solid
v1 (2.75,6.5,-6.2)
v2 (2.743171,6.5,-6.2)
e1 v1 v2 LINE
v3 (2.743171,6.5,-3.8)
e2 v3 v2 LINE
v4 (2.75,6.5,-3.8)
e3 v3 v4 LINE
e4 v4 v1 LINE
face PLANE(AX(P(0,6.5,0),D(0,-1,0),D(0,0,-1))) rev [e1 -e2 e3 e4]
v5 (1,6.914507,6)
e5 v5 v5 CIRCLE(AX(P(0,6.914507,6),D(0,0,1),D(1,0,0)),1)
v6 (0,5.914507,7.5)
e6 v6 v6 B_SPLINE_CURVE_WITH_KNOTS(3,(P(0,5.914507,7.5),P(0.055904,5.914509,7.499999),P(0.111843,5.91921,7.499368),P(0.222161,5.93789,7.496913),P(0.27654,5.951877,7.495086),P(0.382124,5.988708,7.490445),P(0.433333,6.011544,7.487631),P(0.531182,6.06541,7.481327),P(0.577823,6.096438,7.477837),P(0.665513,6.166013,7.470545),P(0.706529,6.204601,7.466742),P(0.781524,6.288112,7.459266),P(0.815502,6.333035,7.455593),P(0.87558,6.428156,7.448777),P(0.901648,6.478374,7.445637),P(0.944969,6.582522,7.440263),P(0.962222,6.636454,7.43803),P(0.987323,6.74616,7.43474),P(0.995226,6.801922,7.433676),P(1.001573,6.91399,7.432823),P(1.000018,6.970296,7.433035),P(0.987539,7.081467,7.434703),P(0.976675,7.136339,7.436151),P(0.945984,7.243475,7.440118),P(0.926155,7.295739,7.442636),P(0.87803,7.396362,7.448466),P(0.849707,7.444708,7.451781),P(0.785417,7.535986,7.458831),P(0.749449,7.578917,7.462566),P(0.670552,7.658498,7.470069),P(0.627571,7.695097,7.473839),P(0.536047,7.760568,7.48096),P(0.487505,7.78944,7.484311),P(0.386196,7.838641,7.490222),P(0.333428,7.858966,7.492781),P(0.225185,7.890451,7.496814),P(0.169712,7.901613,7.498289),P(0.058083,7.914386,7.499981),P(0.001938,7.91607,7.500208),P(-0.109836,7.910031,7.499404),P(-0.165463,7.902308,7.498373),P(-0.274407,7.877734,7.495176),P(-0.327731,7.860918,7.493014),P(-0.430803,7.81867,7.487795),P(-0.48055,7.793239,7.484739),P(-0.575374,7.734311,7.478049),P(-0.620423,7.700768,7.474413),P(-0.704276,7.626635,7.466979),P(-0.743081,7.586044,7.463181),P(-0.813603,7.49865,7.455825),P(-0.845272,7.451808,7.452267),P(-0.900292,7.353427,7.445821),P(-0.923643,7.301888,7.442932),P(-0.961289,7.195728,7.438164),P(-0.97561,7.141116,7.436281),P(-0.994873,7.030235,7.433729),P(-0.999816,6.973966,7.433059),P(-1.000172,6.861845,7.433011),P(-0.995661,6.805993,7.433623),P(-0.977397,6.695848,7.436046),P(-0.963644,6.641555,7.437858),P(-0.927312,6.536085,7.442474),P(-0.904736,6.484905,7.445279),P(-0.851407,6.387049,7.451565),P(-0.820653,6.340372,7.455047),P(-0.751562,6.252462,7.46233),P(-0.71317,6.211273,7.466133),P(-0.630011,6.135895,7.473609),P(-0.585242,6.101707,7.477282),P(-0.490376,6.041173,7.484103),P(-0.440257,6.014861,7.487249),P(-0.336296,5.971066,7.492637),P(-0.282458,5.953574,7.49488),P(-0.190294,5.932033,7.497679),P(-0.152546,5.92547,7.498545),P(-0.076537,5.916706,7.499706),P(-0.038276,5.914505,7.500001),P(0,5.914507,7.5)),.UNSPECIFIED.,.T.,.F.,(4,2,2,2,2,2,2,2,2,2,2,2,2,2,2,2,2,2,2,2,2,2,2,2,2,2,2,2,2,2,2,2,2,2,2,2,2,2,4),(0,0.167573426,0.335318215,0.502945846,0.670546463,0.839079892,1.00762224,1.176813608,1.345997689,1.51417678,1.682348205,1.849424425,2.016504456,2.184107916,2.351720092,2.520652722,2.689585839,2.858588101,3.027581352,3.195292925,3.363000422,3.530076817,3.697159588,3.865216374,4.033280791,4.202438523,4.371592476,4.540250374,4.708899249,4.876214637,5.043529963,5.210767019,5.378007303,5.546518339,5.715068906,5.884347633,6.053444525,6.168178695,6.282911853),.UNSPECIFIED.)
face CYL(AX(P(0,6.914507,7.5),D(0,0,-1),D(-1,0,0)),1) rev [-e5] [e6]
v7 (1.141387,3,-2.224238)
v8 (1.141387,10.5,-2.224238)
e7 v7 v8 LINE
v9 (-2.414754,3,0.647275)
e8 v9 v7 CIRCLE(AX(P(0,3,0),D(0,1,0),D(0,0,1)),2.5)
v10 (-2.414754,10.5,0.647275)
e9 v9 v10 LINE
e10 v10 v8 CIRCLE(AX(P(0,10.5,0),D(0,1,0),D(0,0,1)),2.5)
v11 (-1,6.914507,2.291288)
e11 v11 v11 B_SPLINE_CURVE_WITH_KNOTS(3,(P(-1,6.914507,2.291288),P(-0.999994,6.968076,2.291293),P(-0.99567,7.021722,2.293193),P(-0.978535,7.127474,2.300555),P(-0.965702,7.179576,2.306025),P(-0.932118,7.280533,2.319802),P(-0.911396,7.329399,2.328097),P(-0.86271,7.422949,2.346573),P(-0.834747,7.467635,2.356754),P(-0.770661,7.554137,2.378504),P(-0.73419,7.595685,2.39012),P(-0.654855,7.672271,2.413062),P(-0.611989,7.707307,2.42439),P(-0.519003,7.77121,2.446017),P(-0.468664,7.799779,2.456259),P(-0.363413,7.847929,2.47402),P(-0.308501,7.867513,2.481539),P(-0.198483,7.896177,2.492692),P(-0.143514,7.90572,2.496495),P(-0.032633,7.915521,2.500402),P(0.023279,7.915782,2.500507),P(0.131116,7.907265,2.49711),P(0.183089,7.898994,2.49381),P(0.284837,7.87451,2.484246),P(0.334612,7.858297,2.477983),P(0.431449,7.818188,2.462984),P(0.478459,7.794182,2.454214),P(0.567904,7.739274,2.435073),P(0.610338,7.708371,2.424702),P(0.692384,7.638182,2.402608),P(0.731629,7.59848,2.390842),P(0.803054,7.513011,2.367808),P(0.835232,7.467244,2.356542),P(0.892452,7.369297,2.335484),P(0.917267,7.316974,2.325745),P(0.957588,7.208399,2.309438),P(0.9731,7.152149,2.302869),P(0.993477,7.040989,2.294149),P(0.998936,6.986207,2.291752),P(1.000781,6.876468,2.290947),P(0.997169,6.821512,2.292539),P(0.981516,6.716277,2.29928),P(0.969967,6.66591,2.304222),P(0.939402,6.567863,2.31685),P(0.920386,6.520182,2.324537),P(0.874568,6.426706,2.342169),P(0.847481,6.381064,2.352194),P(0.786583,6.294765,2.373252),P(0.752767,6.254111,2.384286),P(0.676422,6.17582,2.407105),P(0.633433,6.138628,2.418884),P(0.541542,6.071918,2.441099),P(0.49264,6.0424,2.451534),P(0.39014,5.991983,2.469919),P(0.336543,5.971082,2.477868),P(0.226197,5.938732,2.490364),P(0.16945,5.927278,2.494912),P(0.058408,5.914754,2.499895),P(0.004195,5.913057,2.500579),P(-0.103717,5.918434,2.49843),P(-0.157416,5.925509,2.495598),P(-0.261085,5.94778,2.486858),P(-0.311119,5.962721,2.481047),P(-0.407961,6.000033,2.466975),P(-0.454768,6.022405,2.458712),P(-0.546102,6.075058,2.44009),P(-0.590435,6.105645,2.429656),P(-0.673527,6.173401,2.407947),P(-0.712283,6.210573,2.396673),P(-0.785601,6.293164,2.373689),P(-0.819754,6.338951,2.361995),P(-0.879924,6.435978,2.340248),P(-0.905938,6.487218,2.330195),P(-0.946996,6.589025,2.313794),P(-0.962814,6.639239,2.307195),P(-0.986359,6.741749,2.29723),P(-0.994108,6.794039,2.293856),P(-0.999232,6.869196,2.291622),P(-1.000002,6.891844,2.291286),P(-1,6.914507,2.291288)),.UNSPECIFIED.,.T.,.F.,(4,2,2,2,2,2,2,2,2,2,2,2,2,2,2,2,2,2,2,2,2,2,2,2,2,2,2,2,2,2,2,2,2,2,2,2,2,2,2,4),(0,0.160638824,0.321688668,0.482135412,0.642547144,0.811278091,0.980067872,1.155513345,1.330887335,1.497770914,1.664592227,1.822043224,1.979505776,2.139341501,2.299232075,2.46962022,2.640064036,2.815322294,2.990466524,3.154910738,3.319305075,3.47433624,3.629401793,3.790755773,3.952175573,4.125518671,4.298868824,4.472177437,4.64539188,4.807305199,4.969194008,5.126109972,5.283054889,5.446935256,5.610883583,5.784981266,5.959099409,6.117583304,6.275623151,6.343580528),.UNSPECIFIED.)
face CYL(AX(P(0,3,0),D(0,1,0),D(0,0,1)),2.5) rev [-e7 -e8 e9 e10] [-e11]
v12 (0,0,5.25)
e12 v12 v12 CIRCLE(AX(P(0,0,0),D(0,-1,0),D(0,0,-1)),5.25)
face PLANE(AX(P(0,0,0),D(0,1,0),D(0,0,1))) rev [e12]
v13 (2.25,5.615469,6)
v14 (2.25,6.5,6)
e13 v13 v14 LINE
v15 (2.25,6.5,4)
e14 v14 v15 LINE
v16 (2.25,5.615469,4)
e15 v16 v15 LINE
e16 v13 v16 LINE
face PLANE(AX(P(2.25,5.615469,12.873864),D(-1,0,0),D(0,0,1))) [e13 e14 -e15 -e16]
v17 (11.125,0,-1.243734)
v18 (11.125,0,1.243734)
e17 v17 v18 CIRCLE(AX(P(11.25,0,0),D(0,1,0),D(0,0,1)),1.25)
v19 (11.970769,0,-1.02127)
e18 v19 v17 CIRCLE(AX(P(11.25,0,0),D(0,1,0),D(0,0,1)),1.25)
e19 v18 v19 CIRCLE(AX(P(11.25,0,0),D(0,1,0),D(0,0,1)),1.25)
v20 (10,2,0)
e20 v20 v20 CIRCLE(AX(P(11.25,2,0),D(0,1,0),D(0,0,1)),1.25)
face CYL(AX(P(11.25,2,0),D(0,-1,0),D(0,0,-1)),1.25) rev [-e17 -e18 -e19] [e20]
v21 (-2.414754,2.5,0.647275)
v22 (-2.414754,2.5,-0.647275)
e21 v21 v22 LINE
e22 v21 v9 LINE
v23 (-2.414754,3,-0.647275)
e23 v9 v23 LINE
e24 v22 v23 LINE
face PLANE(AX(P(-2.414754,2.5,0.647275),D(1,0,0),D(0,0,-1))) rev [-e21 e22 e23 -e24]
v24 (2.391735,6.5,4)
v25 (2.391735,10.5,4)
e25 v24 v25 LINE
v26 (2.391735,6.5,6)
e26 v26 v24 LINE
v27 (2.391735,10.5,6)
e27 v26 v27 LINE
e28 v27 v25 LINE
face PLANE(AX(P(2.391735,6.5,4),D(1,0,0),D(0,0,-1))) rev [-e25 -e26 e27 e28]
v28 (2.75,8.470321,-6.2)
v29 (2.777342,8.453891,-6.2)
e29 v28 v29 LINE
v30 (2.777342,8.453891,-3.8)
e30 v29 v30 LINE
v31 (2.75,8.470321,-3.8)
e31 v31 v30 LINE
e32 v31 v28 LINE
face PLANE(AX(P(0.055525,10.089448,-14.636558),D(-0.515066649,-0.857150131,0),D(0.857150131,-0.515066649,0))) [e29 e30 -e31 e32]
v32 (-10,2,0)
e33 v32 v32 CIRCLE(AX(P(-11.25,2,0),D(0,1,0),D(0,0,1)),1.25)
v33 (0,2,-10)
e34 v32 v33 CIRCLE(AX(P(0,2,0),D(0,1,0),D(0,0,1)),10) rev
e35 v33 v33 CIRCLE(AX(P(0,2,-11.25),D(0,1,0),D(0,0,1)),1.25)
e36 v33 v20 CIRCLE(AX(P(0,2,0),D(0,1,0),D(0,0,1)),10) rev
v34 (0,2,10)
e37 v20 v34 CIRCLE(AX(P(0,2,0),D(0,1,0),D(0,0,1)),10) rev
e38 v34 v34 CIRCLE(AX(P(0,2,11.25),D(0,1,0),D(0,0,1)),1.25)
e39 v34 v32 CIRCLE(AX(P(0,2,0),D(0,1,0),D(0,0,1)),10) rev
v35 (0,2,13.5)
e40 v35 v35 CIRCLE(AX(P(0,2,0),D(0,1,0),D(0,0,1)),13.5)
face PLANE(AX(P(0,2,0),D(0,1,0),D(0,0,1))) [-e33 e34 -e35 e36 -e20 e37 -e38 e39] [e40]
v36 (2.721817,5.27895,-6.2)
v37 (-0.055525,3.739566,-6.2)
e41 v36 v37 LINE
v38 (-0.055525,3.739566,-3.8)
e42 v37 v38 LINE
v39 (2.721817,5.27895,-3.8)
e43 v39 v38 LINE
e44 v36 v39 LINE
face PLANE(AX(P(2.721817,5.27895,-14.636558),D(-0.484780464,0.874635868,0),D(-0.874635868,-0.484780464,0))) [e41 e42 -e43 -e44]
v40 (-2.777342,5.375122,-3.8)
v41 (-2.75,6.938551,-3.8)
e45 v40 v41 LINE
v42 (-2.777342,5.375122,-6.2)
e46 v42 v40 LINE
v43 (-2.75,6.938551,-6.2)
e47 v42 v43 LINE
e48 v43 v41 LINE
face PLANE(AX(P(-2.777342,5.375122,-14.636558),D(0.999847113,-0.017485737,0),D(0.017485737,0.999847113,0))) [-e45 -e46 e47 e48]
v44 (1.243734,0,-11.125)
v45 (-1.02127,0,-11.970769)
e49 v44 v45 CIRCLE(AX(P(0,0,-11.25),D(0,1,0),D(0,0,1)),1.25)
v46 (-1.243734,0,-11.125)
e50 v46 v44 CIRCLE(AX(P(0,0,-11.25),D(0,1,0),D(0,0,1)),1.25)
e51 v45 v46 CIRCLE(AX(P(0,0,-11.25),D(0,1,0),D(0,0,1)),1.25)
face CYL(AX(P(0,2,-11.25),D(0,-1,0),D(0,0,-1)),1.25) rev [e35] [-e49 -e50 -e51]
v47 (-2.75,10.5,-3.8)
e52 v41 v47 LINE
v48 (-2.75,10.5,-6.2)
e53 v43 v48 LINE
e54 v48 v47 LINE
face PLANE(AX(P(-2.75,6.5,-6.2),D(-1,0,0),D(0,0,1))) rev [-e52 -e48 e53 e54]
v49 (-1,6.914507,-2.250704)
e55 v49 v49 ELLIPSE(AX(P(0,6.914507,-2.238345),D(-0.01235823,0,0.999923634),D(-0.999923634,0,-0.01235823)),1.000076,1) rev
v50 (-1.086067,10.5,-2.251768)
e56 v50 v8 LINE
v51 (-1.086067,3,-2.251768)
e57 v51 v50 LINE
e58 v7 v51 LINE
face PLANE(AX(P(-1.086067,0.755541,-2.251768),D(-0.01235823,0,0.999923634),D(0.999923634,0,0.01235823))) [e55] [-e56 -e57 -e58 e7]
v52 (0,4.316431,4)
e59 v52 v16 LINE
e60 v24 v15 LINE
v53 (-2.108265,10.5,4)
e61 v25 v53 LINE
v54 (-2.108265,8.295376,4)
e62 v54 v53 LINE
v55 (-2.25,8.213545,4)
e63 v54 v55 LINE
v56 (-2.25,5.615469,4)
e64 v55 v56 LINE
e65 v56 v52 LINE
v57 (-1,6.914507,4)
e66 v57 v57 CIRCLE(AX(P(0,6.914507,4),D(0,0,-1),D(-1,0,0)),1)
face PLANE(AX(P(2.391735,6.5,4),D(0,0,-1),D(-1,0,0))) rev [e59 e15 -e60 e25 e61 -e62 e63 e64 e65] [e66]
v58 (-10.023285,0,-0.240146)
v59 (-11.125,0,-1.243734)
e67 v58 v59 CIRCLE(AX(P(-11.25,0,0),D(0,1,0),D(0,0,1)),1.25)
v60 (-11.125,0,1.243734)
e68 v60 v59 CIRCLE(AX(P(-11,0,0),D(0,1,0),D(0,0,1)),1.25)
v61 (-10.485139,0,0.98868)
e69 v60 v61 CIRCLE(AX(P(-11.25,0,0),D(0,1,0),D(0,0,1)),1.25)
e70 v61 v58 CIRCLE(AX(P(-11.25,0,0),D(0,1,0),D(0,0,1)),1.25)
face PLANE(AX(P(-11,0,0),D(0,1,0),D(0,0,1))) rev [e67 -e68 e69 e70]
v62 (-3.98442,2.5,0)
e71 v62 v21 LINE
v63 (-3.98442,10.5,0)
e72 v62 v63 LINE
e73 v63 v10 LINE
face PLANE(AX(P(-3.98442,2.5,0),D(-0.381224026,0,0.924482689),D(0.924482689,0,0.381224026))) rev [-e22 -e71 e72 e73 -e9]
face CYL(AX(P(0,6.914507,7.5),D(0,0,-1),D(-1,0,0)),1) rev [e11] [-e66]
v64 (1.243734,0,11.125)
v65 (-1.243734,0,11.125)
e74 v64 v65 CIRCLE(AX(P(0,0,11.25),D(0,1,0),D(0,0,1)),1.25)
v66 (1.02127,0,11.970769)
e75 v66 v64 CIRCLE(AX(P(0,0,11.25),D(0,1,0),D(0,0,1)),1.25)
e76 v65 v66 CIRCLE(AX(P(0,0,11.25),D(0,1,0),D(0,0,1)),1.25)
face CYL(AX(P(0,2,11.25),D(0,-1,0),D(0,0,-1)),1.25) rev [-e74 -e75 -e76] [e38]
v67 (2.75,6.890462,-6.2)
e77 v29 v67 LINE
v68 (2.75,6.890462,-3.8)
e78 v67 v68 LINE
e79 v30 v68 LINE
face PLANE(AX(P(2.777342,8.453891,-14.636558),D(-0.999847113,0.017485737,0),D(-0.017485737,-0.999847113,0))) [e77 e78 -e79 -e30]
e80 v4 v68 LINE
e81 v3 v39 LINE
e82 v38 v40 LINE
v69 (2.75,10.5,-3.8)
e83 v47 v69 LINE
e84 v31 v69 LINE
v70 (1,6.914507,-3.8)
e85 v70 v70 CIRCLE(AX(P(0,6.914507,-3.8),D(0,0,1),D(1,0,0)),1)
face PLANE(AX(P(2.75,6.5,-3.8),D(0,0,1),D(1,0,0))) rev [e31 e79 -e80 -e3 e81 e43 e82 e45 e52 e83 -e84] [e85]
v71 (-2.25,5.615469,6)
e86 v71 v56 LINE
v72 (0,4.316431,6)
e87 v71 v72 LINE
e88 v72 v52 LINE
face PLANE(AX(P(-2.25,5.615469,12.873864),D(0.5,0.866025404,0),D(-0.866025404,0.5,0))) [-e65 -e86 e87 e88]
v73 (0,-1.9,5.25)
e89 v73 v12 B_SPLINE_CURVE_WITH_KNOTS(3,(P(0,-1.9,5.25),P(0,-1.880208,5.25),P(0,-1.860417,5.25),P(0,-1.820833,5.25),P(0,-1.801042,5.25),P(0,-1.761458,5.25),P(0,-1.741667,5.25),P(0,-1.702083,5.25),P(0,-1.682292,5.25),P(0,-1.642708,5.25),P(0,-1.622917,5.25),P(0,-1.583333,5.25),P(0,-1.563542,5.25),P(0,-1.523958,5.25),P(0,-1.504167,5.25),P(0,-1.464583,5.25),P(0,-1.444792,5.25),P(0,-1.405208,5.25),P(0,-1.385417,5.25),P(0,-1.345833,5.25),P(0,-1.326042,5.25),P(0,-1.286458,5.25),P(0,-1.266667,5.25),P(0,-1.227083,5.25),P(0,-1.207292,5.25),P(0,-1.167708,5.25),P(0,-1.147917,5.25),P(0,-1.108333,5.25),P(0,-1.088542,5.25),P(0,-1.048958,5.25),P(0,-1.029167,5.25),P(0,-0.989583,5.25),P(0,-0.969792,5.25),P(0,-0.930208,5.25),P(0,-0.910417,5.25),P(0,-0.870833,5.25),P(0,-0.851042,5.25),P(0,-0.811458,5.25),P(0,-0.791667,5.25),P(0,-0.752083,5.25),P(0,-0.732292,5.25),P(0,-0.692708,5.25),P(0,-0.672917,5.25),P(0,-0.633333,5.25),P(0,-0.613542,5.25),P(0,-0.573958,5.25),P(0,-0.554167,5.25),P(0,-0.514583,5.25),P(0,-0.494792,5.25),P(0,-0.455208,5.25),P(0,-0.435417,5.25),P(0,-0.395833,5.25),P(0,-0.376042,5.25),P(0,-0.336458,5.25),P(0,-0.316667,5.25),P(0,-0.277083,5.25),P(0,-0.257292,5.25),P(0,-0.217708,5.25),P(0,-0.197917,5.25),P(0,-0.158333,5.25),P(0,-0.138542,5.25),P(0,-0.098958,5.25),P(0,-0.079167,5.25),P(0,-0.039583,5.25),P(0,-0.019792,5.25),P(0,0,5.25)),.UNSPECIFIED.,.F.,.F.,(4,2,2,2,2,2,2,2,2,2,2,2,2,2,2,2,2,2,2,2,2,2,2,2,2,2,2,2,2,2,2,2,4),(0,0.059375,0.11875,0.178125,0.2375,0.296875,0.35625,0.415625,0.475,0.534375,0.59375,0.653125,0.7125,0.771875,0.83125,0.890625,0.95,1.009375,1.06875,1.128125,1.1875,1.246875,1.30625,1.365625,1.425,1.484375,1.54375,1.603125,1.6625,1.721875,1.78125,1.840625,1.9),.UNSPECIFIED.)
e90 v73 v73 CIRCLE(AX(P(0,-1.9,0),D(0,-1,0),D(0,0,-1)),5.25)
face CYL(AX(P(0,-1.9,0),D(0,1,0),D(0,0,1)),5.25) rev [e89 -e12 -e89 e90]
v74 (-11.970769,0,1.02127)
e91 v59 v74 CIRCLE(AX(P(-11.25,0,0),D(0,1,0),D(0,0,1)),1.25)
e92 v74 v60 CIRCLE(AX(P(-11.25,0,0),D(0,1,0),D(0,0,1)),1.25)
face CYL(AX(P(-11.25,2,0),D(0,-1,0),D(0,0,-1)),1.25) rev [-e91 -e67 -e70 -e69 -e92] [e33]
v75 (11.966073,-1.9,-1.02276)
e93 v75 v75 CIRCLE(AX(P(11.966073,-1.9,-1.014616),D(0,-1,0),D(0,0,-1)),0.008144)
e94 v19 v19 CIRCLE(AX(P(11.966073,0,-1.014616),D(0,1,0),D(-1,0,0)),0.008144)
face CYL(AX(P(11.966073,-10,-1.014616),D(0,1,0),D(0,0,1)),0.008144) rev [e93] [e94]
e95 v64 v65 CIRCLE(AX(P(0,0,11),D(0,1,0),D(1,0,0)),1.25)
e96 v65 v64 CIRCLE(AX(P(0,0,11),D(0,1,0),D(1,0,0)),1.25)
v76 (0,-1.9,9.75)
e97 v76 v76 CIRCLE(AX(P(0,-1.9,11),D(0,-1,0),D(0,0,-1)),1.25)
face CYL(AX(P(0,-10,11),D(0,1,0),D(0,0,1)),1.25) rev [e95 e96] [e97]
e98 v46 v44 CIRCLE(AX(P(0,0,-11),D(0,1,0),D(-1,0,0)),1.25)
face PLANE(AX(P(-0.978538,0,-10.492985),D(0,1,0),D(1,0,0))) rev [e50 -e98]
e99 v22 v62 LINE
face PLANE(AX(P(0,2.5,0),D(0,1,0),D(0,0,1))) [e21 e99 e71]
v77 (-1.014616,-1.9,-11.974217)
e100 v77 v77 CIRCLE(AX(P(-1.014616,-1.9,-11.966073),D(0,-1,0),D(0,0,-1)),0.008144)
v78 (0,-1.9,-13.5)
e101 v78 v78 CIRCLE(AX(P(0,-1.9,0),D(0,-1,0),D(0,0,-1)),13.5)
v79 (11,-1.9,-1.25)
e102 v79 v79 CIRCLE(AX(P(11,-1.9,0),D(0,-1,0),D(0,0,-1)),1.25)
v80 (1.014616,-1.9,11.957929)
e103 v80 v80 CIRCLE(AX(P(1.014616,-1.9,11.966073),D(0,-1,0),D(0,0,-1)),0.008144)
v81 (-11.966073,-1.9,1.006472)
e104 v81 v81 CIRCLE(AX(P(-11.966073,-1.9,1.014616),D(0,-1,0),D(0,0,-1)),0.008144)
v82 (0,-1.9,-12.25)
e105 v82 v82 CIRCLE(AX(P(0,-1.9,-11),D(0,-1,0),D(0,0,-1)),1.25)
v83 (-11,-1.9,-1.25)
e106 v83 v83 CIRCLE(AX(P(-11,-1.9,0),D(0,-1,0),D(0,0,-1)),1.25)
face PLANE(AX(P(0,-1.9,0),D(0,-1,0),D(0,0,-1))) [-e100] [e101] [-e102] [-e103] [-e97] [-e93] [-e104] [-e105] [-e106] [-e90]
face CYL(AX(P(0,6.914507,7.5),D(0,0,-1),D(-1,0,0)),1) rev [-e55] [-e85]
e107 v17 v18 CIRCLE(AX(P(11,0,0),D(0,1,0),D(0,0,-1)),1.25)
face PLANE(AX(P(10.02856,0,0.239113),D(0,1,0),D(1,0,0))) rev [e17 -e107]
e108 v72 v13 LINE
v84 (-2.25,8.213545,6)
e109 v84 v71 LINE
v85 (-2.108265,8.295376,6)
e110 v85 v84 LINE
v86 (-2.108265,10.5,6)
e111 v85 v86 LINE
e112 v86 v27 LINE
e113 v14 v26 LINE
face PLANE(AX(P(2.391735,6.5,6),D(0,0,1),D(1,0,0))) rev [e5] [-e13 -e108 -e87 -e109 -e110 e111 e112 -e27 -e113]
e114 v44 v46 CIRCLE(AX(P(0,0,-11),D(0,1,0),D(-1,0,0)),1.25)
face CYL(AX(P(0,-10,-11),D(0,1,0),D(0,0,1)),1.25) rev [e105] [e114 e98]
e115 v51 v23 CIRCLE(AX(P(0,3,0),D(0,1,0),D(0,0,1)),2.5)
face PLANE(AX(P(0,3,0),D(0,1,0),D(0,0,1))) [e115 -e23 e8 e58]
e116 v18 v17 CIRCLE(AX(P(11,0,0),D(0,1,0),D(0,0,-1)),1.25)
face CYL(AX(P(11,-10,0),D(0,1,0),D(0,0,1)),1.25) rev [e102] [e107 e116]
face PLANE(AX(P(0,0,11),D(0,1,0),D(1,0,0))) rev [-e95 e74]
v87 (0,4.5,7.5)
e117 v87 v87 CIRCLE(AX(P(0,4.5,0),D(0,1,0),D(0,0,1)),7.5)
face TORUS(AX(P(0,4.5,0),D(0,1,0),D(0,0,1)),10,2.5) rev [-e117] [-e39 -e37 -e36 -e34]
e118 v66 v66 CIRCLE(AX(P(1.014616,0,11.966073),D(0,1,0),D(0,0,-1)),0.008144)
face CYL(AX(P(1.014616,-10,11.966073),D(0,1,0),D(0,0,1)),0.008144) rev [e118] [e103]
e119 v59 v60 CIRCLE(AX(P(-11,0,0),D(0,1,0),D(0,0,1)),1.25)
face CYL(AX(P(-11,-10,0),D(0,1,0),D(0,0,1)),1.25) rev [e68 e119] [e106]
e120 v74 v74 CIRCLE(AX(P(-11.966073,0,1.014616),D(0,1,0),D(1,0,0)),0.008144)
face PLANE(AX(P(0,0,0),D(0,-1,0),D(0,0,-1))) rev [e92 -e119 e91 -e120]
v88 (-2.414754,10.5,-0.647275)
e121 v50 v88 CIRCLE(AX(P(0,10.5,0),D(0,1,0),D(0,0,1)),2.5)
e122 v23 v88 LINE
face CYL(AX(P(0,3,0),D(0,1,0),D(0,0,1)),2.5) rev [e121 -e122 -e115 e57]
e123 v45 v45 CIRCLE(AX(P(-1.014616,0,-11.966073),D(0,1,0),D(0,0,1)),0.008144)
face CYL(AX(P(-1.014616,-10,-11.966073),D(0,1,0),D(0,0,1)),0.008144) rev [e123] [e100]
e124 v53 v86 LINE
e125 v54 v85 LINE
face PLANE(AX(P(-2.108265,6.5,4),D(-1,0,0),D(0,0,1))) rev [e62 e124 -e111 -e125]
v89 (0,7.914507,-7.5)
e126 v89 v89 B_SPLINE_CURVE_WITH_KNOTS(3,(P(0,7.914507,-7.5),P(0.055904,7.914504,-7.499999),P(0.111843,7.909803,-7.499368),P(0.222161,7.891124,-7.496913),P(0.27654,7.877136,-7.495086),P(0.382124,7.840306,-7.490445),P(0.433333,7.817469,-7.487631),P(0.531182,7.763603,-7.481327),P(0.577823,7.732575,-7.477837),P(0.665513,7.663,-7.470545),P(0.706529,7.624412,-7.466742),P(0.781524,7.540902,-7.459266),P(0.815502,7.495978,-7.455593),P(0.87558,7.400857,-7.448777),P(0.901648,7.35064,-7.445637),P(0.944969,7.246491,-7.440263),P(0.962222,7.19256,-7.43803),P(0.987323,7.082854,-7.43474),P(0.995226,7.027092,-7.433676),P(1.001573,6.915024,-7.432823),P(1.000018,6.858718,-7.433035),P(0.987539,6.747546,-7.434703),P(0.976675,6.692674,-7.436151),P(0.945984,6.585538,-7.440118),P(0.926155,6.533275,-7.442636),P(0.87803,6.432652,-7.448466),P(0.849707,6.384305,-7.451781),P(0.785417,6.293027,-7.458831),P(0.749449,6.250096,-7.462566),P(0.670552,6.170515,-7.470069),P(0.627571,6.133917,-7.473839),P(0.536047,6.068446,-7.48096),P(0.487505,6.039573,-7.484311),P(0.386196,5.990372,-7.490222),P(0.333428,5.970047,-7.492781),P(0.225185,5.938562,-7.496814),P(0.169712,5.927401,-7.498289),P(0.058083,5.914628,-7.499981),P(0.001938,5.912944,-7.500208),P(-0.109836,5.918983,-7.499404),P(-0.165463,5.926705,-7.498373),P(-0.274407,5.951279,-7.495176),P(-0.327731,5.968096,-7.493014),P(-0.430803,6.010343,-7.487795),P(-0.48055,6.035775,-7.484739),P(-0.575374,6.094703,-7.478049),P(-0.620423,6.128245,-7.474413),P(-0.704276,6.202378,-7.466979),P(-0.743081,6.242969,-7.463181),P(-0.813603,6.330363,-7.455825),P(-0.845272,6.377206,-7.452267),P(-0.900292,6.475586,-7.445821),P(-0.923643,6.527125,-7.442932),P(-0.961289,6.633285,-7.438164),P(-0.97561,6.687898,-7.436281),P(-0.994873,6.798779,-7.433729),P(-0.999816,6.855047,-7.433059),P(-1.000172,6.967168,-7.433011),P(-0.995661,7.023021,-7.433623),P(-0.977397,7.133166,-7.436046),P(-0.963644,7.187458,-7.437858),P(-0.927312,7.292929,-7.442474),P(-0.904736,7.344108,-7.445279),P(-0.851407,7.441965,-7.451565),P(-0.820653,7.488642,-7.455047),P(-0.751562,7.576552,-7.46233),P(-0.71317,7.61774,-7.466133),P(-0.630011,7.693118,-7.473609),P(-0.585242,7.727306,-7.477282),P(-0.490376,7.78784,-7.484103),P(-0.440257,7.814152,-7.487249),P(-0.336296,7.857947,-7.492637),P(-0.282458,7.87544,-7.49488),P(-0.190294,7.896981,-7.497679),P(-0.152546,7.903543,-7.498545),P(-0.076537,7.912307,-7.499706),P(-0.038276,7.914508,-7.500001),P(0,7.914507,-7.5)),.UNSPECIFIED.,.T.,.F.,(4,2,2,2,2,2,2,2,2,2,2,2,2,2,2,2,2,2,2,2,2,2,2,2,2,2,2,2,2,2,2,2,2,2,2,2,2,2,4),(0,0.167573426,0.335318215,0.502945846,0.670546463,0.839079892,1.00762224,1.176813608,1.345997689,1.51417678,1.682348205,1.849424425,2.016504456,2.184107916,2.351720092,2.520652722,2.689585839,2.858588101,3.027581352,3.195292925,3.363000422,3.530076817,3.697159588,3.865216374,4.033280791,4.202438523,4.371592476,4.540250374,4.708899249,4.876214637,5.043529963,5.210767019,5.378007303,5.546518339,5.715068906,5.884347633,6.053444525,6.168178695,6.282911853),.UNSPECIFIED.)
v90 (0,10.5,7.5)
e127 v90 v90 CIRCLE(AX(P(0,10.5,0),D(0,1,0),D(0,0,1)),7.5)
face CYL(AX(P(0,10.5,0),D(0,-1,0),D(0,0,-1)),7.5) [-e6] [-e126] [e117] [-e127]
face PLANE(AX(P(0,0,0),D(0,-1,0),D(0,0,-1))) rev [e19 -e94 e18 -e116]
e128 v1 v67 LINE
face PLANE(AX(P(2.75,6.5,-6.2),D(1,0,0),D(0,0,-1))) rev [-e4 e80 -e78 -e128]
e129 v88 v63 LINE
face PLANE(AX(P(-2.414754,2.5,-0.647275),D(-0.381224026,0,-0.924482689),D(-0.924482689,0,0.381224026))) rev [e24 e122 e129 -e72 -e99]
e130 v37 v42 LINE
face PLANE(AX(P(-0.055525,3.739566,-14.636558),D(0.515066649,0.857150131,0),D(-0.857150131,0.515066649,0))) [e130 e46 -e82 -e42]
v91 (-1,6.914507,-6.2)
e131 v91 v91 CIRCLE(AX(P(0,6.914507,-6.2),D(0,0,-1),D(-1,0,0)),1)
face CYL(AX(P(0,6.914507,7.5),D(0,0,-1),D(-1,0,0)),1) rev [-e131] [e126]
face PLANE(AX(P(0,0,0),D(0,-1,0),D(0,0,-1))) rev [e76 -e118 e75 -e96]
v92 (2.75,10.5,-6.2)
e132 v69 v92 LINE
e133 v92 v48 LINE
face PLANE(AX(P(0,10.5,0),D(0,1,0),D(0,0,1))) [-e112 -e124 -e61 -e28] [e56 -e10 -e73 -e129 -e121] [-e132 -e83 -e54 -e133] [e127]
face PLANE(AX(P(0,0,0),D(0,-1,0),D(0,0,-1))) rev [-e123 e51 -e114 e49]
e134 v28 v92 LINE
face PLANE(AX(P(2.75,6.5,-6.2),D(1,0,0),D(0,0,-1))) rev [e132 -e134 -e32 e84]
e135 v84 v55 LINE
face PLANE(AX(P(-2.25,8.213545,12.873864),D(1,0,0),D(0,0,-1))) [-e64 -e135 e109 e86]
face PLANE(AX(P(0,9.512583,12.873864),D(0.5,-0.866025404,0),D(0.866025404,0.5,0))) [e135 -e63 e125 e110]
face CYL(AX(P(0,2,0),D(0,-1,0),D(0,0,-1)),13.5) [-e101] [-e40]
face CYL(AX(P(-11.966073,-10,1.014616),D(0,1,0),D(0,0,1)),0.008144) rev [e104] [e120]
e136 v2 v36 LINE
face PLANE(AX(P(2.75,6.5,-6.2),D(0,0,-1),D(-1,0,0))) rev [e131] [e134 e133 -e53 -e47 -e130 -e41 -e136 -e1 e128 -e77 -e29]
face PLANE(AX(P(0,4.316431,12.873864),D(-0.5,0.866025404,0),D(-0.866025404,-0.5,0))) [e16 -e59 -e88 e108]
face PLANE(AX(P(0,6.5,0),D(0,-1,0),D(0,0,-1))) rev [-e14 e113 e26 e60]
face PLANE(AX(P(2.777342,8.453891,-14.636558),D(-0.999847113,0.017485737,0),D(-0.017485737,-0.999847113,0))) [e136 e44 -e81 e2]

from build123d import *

# Parameters (mm, degrees)
SKETCH1_R               = 13.5
SKETCH1_R_2             = 1.25
BOSS_EXTRUDE2_DEPTH     = 2
SKETCH2_R               = 7.5
BOSS_EXTRUDE3_DEPTH     = 8.5
SKETCH4_R               = 2.5
CUT_EXTRUDE1_DEPTH      = 7.5
BOSS_EXTRUDE6_DEPTH     = 7.5
CUT_EXTRUDE2_DEPTH      = 7.5
CUT_EXTRUDE2_DEPTH_BACK = 11.75
SKETCH5_R               = 1
BOSS_EXTRUDE5_START     = 1.9
SKETCH7_R               = 13.5
SKETCH7_R_2             = 5.25
BOSS_EXTRUDE5_DEPTH     = 1.9
CUT_EXTRUDE3_DEPTH      = 8
FILLET1_R               = 2.5
SKETCH12_R              = 0.00537481
SKETCH12_R_2            = 0.008144056
SKETCH12_R_3            = 1.25
SKETCH12_R_4            = 0.012822725
CUT_EXTRUDE4_DEPTH      = 10
CIRPATTERN1_COUNT       = 4
SKETCH13_W              = 5.5
SKETCH13_H              = 2.4
SKETCH13_W_2            = 4.5
SKETCH13_H_2            = 2
CUT_EXTRUDE5_DEPTH      = 4
CUT_EXTRUDE6_DEPTH      = 2.4
CUT_EXTRUDE7_DEPTH      = 2


with BuildPart() as part:
    # Sketch1 → Boss-Extrude2 (new body)
    with BuildSketch(Plane(origin=(0, 0, 0), x_dir=(1, 0, 0), z_dir=(0, 1, 0))):
        with Locations(Location((0, 0, 0), (0, 0, 270))):
            Circle(SKETCH1_R)
        with Locations(Location((11.25, 0, 0), (0, 0, 270))):
            Circle(SKETCH1_R_2, mode=Mode.SUBTRACT)
        with Locations(Location((0, -11.25, 0), (0, 0, 270))):
            Circle(SKETCH1_R_2, mode=Mode.SUBTRACT)
        with Locations(Location((-11.25, 0, 0), (0, 0, 270))):
            Circle(SKETCH1_R_2, mode=Mode.SUBTRACT)
        with Locations(Location((0, 11.25, 0), (0, 0, 270))):
            Circle(SKETCH1_R_2, mode=Mode.SUBTRACT)
    extrude(amount=BOSS_EXTRUDE2_DEPTH)

    # Sketch2 → Boss-Extrude3 (add)
    with BuildSketch(Plane(origin=(0, 2, 0), x_dir=(1, 0, 0), z_dir=(0, 1, 0))):
        with Locations(Location((0, 0, 0), (0, 0, 270))):
            Circle(SKETCH2_R)
    extrude(amount=BOSS_EXTRUDE3_DEPTH)

    # Sketch4 → Cut-Extrude1 (cut)
    with BuildSketch(Plane(origin=(0, 10.5, 0), x_dir=(1, 0, 0), z_dir=(0, 1, 0))):
        with Locations(Location((0, 0, 0), (0, 0, 270))):
            Circle(SKETCH4_R)
    extrude(amount=-CUT_EXTRUDE1_DEPTH, mode=Mode.SUBTRACT)

    # Sketch16 → Boss-Extrude6 (add)
    with BuildSketch(Plane(origin=(0, 10.5, 0), x_dir=(1, 0, 0), z_dir=(0, 1, 0))):
        with BuildLine():
            Line((-1.086066966, 2.251767871), (1.141386704, 2.224238385))
            ThreePointArc((1.141386704, 2.224238385), (0.030895574, 2.499809085), (-1.086066966, 2.251767871))
        make_face()
    extrude(amount=-BOSS_EXTRUDE6_DEPTH)

    # Sketch5 → Cut-Extrude2 (cut, two sides: drawn at the far end of the back side and taken through both)
    with BuildSketch(Plane.XY.offset(-CUT_EXTRUDE2_DEPTH_BACK)):
        with Locations(Location((0, 6.914506731, 0), (0, 0, 180))):
            Circle(SKETCH5_R)
    extrude(amount=CUT_EXTRUDE2_DEPTH + CUT_EXTRUDE2_DEPTH_BACK, mode=Mode.SUBTRACT)

    # Sketch7 → Boss-Extrude5 (add)
    with BuildSketch(Plane.XZ.offset(BOSS_EXTRUDE5_START)):
        with Locations(Location((0, 0, 0), (0, 0, 270))):
            Circle(SKETCH7_R)
        with Locations(Location((0, 0, 0), (0, 0, 90))):
            Circle(SKETCH7_R_2, mode=Mode.SUBTRACT)
    extrude(amount=-BOSS_EXTRUDE5_DEPTH)

    # Sketch9 → Cut-Extrude3 (cut)
    with BuildSketch(Plane(origin=(0, 10.5, 0), x_dir=(1, 0, 0), z_dir=(0, 1, 0))):
        Polygon((-2.414753661, -0.64727487), (-2.414753661, 0.64727487), (-3.984419716, 0), align=None)
    extrude(amount=-CUT_EXTRUDE3_DEPTH, mode=Mode.SUBTRACT)

    # Fillet1
    fillet1_edges = [part.edges().sort_by_distance(p)[0] for p in [
        (0, 2, -7.5),
    ]]
    fillet(fillet1_edges, radius=FILLET1_R - 0.0001)  # a hair under: the kernel refuses the full size

    # Sketch12 → Cut-Extrude4 (cut)
    with BuildSketch(Plane(origin=(0, 0, 0), x_dir=(1, 0, 0), z_dir=(0, 1, 0))):
        with Locations(Location((-0.239113034, -10.028559531, 0), (0, 0, 101.087404696))):
            Circle(SKETCH12_R)
        with Locations(Location((-1.014615915, 11.966073133, 0), (0, 0, 144.78716899))):
            Circle(SKETCH12_R_2)
        with Locations(Location((-11, 0, 0), (0, 0, 264.260829523))):
            Circle(SKETCH12_R_3)
        with Locations(Location((10.492985163, 0.978537759, 0), (0, 0, 127.726196418))):
            Circle(SKETCH12_R_4)
    cut_extrude4 = extrude(amount=-CUT_EXTRUDE4_DEPTH, mode=Mode.SUBTRACT)

    # CirPattern1: Cut-Extrude4 ×4 about axis
    cirpattern1_axis = Axis((0, 0, 0), (0, 1, 0))
    for i in range(1, CIRPATTERN1_COUNT):
        add(cut_extrude4.rotate(cirpattern1_axis, i * 360 / CIRPATTERN1_COUNT), mode=Mode.SUBTRACT)

    # Sketch13 → Cut-Extrude5 (cut)
    with BuildSketch(Plane(origin=(0, 10.5, 0), x_dir=(1, 0, 0), z_dir=(0, 1, 0))):
        with Locations((0, 5)):
            Rectangle(SKETCH13_W, SKETCH13_H)
        with Locations((0.141735204, -5)):
            Rectangle(SKETCH13_W_2, SKETCH13_H_2)
    extrude(amount=-CUT_EXTRUDE5_DEPTH, mode=Mode.SUBTRACT)

    # Sketch14 → Cut-Extrude6 (cut)
    with BuildSketch(Plane(origin=(0, 0, -3.8), x_dir=(-1, 0, 0), z_dir=(0, 0, -1))):
        Polygon((2.721817224, 8.550063007), (-0.055524673, 10.089447729), (-2.777341897, 8.453891453), (-2.721817224, 5.278950455), (0.055524673, 3.739565732), (2.777341897, 5.375122009), align=None)
    extrude(amount=CUT_EXTRUDE6_DEPTH, mode=Mode.SUBTRACT)

    # Sketch15 → Cut-Extrude7 (cut)
    with BuildSketch(Plane.XY.offset(4)):
        Polygon((2.25, 8.213544837), (0, 9.512582942), (-2.25, 8.213544837), (-2.25, 5.615468625), (0, 4.31643052), (2.25, 5.615468625), align=None)
    extrude(amount=CUT_EXTRUDE7_DEPTH, mode=Mode.SUBTRACT)


solid = part.part
